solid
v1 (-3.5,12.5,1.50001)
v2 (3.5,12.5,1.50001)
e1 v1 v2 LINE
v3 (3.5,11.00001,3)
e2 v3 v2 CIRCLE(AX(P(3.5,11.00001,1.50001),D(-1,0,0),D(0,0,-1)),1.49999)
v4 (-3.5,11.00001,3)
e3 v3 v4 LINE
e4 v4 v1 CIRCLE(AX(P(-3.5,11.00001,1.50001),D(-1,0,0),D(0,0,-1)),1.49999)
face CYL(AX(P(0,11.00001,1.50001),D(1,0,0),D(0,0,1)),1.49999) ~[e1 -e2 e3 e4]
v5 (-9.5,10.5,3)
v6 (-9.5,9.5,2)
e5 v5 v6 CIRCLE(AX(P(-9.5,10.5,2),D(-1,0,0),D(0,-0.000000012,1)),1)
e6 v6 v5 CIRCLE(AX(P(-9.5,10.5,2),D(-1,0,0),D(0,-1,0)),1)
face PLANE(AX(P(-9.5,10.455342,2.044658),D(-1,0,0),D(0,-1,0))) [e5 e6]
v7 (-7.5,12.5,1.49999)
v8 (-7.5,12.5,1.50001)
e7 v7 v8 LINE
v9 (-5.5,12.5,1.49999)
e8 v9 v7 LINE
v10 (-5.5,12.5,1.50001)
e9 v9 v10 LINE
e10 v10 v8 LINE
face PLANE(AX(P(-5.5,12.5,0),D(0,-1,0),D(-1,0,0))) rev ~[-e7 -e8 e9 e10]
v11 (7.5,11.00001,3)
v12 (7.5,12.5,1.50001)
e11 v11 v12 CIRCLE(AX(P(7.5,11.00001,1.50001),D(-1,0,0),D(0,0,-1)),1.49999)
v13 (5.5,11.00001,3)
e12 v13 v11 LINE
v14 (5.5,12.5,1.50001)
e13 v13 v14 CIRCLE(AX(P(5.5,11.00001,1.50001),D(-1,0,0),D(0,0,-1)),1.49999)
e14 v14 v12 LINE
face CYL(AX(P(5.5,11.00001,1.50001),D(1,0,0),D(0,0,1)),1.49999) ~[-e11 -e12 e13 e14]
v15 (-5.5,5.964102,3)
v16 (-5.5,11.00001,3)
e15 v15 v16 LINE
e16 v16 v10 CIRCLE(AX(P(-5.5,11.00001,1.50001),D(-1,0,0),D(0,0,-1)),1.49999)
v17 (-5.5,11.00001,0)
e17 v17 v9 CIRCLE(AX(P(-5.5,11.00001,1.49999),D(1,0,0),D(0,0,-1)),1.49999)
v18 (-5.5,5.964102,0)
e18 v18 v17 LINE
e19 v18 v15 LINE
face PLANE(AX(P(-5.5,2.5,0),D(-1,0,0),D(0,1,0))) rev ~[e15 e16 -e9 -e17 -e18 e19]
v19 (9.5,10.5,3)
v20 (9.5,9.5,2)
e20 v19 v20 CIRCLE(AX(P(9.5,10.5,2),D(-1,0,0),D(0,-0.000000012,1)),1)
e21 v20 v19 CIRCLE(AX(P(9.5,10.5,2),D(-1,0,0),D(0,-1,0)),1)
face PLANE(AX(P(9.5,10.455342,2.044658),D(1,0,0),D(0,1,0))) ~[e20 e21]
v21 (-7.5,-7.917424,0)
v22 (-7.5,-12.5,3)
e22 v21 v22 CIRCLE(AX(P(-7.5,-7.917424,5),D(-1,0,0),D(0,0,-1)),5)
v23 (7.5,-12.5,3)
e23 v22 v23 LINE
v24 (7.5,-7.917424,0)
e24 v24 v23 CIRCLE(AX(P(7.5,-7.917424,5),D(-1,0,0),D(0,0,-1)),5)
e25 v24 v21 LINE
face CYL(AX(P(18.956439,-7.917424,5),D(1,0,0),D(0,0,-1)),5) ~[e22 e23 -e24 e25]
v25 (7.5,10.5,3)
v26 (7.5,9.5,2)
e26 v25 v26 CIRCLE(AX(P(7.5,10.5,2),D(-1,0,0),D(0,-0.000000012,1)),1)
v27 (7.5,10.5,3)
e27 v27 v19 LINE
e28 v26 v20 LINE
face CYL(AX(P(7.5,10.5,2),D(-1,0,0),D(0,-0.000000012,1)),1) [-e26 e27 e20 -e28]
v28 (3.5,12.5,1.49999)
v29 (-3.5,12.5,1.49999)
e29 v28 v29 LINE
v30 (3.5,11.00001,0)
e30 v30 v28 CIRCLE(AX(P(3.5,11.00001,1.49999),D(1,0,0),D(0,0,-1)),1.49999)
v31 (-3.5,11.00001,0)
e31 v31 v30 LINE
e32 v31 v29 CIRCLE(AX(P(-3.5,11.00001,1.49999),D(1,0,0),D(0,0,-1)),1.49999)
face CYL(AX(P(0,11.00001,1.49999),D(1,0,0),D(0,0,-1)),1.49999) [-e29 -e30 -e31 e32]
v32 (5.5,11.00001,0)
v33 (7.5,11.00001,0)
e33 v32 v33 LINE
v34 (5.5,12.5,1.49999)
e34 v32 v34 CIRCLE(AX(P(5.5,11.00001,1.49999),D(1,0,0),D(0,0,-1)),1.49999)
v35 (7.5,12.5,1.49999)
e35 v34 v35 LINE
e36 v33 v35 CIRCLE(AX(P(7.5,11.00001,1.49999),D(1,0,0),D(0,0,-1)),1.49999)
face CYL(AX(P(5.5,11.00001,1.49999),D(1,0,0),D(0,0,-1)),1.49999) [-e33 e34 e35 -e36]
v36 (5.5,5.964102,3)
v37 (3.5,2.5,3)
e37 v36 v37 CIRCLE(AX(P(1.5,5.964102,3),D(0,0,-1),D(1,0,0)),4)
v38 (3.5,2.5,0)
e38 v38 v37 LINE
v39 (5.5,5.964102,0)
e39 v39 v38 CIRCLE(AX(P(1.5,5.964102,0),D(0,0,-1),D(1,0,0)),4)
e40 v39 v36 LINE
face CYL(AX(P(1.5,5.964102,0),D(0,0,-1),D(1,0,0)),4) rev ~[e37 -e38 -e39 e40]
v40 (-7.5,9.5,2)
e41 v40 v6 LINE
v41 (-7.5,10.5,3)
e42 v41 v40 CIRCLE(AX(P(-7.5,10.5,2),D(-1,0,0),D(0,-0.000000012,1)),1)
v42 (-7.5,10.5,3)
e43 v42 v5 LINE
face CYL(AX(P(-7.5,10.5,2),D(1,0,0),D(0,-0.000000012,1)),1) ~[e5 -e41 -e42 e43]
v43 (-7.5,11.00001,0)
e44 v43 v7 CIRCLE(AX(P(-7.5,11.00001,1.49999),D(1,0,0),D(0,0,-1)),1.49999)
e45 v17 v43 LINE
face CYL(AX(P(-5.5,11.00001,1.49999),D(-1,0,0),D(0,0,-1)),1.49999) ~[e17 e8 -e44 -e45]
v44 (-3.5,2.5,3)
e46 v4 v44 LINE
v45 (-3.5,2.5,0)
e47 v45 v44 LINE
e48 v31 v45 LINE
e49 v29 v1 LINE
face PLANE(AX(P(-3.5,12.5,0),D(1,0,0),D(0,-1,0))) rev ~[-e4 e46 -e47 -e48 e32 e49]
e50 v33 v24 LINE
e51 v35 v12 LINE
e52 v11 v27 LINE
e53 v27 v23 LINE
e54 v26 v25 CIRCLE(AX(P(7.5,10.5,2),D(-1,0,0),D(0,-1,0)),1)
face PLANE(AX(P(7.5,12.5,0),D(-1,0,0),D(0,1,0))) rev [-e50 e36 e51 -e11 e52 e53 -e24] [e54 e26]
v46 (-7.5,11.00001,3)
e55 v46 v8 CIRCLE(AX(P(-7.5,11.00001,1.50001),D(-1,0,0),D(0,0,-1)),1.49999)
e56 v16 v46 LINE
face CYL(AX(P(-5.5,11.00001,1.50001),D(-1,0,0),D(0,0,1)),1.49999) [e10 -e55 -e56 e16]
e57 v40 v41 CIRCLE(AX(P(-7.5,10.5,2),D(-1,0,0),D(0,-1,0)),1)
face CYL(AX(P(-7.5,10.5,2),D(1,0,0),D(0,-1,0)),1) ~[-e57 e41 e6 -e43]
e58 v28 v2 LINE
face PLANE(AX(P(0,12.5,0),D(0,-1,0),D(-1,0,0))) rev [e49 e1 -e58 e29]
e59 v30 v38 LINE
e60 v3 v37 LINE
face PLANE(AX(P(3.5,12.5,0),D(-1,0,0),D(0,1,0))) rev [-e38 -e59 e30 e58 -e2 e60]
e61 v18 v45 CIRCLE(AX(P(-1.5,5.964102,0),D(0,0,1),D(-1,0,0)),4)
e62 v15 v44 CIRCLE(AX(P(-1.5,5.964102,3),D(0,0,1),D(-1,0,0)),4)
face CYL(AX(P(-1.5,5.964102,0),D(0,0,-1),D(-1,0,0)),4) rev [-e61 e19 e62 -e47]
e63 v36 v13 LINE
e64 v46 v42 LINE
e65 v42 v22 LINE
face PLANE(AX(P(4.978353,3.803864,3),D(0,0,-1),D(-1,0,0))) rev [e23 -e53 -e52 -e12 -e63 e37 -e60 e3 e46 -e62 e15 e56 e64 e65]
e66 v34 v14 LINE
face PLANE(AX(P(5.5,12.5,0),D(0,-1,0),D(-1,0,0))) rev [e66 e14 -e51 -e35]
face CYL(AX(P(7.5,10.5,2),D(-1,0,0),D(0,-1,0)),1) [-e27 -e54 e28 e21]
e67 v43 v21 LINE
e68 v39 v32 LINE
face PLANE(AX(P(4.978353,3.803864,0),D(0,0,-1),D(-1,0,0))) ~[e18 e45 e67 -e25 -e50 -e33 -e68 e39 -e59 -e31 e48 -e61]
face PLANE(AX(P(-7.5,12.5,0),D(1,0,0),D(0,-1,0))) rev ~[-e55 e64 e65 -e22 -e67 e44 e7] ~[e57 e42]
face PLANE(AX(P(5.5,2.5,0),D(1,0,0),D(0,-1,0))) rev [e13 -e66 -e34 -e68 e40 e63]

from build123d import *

# Parameters (mm, degrees)
F1_DEPTH    = 3
F3_DEPTH    = 2
F4_R        = 1.49999
F5_T1_DEPTH = 3
F6_T1_DEPTH = 30.4128784748


# Not quite as in the source:
# - a fillet or chamfer that OpenCascade refuses, or shapes differently, is made with other operations: its cross-section is extruded or revolved along the edge and cut away or added
# - a fillet or chamfer is up to 0.001 mm smaller than in the source, because OpenCascade refuses the exact size
# - a feature names something its author has since deleted; it is built from what else it names


with BuildPart() as f1:
    # F0 (on Top) → F1 (new body)
    with BuildSketch(Plane.XY):
        Polygon((-7.5, 12.5), (-7.5, -12.5), (0, -12.5), (0, 12.5), (-3.5, 12.5), (-3.5, 2.5), (-5.5, 2.5), (-5.5, 12.5), align=None)
    extrude(amount=F1_DEPTH)

    # F2 (on face) → F3 (join)
    with BuildSketch(Plane(origin=(-7.5, 0, 0), x_dir=(0, -1, 0), z_dir=(-1, 0, 0))):
        with BuildLine():
            ThreePointArc((-10.4999999883, 3), (-11.2071067853, 1.2928932229), (-9.5, 2))
            ThreePointArc((-9.5, 2), (-9.7928932147, 2.7071067771), (-10.4999999883, 3))
        make_face()
    extrude(amount=F3_DEPTH)

    # F4 (radius 1.5 in the source; OpenCascade refuses exactly that, so slightly less here)
    f4_edges = [f1.edges().sort_by_distance(p)[0] for p in [
        (-6.5, 12.5, 0),
        (-6.5, 12.5, 3),
        (-1.75, 12.5, 0),
        (-1.75, 12.5, 3),
    ]]
    fillet(f4_edges, radius=F4_R)

    # F5: fillet of radius 4 on 1 edges, made by hand

    # F5_s2 → F5_t1 (join)
    with BuildSketch(Plane.XY):
        with BuildLine():
            ThreePointArc((-5.5, 5.9641016151), (-4.9641016151, 3.9641016151), (-3.5, 2.5))
            Line((-3.5, 2.5), (-5.5, 2.5))
            Line((-5.5, 2.5), (-5.5, 5.9641016151))
        make_face()
    extrude(amount=F5_T1_DEPTH)

    # F6: fillet of radius 5 on 1 edges, made by hand

    # F6_s2 → F6_t1 (cut)
    with BuildSketch(Plane.YZ.offset(-18.9564392374)):
        with BuildLine():
            ThreePointArc((-7.917424305, 0), (-10.6560370926, 0.8166998673), (-12.5, 3))
            Line((-12.5, 3), (-12.5, 0))
            Line((-12.5, 0), (-7.917424305, 0))
        make_face()
    extrude(amount=F6_T1_DEPTH, mode=Mode.SUBTRACT)

    # F7: F1 across face


with BuildPart() as f1_1:
    add(f1.part)
    add(f1.part.mirror(Plane(origin=(0, 0.4580070694, 1.5370600849), x_dir=(0, 1, 0), z_dir=(1, 0, 0))))


solid = f1_1.part
